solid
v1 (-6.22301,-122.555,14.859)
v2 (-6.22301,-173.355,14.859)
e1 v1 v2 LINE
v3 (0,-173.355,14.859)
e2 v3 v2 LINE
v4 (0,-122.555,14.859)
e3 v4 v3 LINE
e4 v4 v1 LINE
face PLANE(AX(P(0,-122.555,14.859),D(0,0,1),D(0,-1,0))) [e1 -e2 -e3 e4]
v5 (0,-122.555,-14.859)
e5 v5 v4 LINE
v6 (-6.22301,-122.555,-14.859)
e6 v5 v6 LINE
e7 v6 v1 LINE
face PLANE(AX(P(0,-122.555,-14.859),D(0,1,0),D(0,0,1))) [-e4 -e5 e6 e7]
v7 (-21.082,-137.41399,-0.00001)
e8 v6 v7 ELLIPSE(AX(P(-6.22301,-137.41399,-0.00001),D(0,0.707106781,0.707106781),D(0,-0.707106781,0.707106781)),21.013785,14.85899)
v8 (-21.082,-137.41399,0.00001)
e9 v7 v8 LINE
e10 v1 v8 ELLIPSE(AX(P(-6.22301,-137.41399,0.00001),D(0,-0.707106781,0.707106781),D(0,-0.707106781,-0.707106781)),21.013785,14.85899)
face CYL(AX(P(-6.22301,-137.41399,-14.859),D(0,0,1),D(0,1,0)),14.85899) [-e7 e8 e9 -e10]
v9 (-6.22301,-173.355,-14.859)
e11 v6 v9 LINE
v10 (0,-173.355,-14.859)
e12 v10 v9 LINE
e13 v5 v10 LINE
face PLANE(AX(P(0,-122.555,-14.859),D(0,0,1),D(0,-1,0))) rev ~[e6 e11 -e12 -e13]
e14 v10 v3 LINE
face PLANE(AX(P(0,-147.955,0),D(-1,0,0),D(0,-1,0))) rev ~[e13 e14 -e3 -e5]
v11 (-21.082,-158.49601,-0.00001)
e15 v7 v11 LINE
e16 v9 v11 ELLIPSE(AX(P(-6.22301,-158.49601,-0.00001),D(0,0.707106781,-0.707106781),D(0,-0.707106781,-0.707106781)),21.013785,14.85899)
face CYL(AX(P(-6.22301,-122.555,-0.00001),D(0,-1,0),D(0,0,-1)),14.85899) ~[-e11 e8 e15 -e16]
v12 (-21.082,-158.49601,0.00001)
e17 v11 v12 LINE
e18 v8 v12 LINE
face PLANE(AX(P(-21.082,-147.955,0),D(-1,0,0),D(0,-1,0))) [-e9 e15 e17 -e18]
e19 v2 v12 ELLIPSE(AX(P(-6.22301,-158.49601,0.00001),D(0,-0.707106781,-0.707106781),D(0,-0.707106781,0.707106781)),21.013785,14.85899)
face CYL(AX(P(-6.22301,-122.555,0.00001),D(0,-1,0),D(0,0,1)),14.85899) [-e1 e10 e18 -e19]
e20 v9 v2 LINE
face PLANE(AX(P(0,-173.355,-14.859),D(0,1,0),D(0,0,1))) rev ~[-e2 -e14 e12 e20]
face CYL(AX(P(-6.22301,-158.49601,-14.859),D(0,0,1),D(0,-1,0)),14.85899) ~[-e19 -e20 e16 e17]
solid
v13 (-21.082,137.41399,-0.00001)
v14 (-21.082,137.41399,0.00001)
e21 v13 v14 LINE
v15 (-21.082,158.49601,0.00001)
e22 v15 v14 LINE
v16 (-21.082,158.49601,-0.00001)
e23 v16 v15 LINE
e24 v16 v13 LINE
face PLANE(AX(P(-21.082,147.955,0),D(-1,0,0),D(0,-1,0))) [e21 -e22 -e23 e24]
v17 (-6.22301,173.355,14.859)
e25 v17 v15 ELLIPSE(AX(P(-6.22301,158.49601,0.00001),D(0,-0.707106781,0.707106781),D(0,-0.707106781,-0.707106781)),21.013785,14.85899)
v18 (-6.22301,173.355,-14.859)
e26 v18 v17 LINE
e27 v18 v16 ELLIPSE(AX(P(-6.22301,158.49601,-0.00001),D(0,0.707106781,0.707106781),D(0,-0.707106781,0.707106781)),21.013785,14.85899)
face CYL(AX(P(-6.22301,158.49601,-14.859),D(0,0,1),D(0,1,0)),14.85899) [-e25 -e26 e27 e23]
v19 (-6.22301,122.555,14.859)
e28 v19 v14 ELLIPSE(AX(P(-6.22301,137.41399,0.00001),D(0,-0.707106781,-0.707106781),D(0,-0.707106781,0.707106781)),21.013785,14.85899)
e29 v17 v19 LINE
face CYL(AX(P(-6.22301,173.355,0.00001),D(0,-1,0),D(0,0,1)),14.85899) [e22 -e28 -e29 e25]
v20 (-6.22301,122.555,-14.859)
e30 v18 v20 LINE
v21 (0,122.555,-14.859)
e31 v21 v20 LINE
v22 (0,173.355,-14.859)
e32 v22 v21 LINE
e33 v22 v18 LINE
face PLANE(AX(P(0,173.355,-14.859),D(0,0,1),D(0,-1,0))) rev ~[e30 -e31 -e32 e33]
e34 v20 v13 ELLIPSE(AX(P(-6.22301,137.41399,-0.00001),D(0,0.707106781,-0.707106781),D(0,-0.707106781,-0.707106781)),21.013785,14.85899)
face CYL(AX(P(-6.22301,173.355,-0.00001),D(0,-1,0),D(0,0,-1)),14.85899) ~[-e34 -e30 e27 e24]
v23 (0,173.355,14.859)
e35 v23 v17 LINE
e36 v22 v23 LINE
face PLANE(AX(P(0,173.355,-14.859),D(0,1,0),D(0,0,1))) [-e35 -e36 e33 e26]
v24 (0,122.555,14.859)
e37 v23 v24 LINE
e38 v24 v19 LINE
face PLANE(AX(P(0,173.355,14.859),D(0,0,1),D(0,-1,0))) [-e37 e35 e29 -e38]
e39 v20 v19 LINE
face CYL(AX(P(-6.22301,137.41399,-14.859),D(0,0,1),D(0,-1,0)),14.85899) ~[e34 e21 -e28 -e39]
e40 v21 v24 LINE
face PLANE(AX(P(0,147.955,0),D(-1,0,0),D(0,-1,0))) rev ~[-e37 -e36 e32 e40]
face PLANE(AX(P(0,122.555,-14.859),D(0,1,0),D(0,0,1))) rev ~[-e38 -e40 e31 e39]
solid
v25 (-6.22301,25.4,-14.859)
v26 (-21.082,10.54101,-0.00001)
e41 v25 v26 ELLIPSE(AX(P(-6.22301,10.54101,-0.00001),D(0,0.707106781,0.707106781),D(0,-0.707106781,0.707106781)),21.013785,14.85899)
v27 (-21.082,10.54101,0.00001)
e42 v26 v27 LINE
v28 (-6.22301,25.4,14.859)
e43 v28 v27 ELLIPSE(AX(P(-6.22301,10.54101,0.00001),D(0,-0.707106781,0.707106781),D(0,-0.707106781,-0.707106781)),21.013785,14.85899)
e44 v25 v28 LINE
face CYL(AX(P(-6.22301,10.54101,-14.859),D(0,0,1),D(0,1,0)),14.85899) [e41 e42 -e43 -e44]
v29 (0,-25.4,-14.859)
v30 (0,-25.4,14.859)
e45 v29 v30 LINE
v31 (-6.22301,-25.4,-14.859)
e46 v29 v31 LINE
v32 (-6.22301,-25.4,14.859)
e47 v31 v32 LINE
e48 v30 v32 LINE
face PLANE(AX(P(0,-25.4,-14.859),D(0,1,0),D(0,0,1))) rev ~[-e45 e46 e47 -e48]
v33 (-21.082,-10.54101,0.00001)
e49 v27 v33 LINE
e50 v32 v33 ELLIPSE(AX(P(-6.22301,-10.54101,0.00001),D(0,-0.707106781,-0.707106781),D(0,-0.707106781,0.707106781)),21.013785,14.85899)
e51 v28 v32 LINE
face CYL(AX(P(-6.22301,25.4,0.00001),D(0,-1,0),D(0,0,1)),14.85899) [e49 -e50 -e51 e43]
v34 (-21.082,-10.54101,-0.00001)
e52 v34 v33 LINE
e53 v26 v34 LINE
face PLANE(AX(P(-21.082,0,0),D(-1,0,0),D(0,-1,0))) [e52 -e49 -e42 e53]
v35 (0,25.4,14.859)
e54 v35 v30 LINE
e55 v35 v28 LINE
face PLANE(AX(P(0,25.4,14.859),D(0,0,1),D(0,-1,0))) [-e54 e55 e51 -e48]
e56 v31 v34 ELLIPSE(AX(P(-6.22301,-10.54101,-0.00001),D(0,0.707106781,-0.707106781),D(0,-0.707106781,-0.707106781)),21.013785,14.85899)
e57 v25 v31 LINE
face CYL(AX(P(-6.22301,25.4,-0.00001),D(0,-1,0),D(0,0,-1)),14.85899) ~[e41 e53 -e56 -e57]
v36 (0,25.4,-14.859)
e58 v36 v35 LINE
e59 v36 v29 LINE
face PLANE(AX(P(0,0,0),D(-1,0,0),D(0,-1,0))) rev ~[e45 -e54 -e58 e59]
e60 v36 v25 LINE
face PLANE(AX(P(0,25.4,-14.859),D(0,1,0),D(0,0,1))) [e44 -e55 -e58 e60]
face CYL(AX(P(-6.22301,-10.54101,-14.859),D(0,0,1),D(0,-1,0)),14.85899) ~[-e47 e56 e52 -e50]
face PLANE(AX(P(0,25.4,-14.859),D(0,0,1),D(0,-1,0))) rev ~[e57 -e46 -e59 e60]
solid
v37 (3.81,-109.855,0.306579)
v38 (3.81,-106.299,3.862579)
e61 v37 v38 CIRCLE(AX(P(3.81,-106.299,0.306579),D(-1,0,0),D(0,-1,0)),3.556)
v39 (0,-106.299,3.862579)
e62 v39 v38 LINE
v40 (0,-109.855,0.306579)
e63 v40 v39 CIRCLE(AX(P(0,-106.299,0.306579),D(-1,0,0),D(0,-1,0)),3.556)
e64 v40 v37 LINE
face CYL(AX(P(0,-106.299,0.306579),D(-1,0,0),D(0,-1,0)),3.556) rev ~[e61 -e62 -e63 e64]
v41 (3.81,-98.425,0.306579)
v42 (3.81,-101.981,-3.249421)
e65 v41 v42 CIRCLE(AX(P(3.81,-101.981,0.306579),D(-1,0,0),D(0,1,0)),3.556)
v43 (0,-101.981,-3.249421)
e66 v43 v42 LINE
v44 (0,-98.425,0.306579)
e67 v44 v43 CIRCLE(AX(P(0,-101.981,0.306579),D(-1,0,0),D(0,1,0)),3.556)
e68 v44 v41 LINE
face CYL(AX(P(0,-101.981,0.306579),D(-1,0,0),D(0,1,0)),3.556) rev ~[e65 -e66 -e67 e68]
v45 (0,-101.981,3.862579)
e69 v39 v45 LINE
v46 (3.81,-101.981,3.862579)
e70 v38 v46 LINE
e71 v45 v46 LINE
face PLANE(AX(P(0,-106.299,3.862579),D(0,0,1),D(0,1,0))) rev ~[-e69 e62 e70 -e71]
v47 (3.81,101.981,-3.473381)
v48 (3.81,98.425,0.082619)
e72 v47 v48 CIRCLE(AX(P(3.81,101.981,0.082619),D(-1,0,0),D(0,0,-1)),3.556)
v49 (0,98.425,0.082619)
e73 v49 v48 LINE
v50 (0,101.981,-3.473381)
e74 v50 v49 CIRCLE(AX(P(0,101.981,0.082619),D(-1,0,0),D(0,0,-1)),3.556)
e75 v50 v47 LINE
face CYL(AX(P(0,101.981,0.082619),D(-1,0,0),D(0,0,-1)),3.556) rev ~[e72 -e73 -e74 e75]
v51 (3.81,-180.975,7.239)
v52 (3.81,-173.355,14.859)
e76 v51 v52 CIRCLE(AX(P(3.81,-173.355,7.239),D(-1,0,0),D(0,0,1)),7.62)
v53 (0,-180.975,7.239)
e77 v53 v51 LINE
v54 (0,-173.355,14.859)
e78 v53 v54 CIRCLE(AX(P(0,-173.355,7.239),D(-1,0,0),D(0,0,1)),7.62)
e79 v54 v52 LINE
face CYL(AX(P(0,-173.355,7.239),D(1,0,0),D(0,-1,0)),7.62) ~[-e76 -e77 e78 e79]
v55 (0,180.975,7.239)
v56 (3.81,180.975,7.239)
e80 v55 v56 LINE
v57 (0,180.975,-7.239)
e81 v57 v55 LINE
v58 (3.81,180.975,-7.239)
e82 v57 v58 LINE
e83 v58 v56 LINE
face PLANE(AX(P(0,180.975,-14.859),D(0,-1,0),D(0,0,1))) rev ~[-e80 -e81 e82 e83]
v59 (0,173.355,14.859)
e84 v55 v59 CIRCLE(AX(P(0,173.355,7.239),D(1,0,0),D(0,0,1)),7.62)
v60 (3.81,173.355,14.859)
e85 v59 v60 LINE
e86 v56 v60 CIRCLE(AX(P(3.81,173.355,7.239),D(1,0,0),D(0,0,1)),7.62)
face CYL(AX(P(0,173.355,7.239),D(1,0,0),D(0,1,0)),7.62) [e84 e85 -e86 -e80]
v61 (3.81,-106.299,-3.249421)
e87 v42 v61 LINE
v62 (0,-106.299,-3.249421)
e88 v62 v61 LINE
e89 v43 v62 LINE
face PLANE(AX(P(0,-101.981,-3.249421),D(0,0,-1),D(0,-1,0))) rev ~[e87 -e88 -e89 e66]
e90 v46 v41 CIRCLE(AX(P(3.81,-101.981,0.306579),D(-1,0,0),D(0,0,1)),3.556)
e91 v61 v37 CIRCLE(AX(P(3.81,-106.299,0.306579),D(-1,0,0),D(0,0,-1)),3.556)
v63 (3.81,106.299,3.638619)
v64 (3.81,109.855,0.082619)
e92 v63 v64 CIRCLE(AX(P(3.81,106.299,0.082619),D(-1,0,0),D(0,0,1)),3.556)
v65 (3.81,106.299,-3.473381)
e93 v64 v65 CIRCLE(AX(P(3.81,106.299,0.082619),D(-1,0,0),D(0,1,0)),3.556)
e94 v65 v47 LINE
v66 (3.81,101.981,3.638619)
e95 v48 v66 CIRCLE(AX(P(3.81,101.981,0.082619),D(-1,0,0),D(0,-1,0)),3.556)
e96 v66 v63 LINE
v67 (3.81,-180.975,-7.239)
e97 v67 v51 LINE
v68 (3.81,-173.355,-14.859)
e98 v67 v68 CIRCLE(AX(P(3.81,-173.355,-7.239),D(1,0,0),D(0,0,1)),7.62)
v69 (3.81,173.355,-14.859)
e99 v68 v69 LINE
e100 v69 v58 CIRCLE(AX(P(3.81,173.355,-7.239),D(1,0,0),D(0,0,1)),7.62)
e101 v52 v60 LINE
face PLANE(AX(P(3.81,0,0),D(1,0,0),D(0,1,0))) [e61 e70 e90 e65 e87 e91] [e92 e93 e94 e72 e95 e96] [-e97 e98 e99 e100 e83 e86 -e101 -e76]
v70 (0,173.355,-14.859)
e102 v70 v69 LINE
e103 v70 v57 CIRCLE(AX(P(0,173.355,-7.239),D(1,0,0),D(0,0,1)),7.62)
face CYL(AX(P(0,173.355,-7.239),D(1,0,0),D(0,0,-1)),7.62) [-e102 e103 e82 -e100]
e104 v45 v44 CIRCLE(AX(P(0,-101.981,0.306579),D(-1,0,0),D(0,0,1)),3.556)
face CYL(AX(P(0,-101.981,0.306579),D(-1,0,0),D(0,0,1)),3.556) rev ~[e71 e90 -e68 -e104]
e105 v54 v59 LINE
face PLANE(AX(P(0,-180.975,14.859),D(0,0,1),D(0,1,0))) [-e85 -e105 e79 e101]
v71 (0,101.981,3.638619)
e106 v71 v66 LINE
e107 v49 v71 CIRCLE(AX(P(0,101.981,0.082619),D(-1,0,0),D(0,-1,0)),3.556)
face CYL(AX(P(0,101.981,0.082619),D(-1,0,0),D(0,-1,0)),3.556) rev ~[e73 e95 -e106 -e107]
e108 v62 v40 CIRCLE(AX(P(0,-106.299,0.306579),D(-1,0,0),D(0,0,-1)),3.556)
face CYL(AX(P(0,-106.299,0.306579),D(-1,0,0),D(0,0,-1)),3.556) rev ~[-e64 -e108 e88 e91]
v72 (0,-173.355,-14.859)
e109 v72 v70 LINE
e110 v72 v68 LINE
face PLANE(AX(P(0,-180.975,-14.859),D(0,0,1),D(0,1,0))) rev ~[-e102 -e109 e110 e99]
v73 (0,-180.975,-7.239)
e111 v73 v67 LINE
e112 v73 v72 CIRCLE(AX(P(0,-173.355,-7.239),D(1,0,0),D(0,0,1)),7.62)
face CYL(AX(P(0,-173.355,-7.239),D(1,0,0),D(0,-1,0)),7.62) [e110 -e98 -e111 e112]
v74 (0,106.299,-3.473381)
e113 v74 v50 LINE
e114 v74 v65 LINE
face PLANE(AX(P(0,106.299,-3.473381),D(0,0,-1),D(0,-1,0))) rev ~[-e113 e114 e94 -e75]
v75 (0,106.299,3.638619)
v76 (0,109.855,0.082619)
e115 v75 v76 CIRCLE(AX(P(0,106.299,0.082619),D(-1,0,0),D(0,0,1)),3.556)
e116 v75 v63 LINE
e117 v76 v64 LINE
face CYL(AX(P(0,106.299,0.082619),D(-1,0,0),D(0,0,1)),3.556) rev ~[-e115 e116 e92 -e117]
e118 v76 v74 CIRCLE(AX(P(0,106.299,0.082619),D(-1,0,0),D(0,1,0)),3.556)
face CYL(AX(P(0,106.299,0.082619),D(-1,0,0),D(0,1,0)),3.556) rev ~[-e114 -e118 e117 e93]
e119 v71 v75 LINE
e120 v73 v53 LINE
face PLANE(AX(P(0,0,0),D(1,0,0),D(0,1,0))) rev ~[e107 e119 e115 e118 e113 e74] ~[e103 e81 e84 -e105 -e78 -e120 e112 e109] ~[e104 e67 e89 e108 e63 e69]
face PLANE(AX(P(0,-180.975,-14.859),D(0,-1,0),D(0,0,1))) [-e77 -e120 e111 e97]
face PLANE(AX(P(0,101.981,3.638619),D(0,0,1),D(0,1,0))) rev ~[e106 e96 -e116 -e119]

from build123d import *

# Parameters (mm, degrees)
F0_W     = 361.95
F0_H     = 29.718
F1_DEPTH = 3.81
F2_R     = 7.62
F4_DEPTH = 3.81
F5_W     = 50.8
F5_H     = 29.718
F6_DEPTH = 21.082
F7_R     = 14.85899
F7_2_R   = 14.85899
F7_3_R   = 14.85899


# Not quite as in the source:
# - a fillet or chamfer is up to 0.001 mm smaller than in the source, because OpenCascade refuses the exact size


with BuildPart() as f1:
    # F0 (on Right) → F1 (new body)
    with BuildSketch(Plane.YZ):
        Rectangle(F0_W, F0_H)
    extrude(amount=F1_DEPTH)

    # F2
    f2_edges = [f1.edges().sort_by_distance(p)[0] for p in [
        (1.905, 180.975, 14.859),
        (1.905, 180.975, -14.859),
        (1.905, -180.975, 14.859),
        (1.905, -180.975, -14.859),
    ]]
    fillet(f2_edges, radius=F2_R)

    # F3 (on face) → F4 (cut, through all)
    with BuildSketch(Plane(origin=(0, 0, 0), x_dir=(0, -1, 0), z_dir=(-1, 0, 0))):
        with BuildLine():
            Line((-101.981, 3.6386192348), (-106.299, 3.6386192348))
            ThreePointArc((-106.299, 3.6386192348), (-108.8134717139, 2.5970909487), (-109.855, 0.0826192348))
            ThreePointArc((-109.855, 0.0826192348), (-108.8134717139, -2.4318524791), (-106.299, -3.4733807652))
            Line((-106.299, -3.4733807652), (-101.981, -3.4733807652))
            ThreePointArc((-101.981, -3.4733807652), (-99.4665282861, -2.4318524791), (-98.425, 0.0826192348))
            ThreePointArc((-98.425, 0.0826192348), (-99.4665282861, 2.5970909487), (-101.981, 3.6386192348))
        make_face()
        with BuildLine():
            Line((106.299, 3.8625788135), (101.981, 3.8625788135))
            ThreePointArc((101.981, 3.8625788135), (99.4665282861, 2.8210505274), (98.425, 0.3065788135))
            ThreePointArc((98.425, 0.3065788135), (99.4665282861, -2.2078929004), (101.981, -3.2494211865))
            Line((101.981, -3.2494211865), (106.299, -3.2494211865))
            ThreePointArc((106.299, -3.2494211865), (108.8134717139, -2.2078929004), (109.855, 0.3065788135))
            ThreePointArc((109.855, 0.3065788135), (108.8134717139, 2.8210505274), (106.299, 3.8625788135))
        make_face()
    extrude(amount=-F4_DEPTH, mode=Mode.SUBTRACT)


with BuildPart() as f6:
    # F5 (on face) → F6 (new body)
    with BuildSketch(Plane(origin=(0, 0, 0), x_dir=(0, -1, 0), z_dir=(-1, 0, 0))):
        with Locations((-147.955, 0)):
            Rectangle(F5_W, F5_H)
    extrude(amount=F6_DEPTH)

    # F7 (radius 14.859 in the source; OpenCascade refuses exactly that, so slightly less here)
    f7_edges = [f6.edges().sort_by_distance(p)[0] for p in [
        (-21.082, 147.955, 14.859),
        (-21.082, 173.355, 0),
        (-21.082, 147.955, -14.859),
        (-21.082, 122.555, 0),
    ]]
    fillet(f7_edges, radius=F7_R)


with BuildPart() as f6b:
    # F5 (on face) → F6, piece 2 (new body)
    with BuildSketch(Plane(origin=(0, 0, 0), x_dir=(0, -1, 0), z_dir=(-1, 0, 0))):
        Rectangle(F5_W, F5_H)
    extrude(amount=F6_DEPTH)

    # F7#2 (radius 14.859 in the source; OpenCascade refuses exactly that, so slightly less here)
    f7_2_edges = [f6b.edges().sort_by_distance(p)[0] for p in [
        (-21.082, 0, 14.859),
        (-21.082, 25.4, 0),
        (-21.082, 0, -14.859),
        (-21.082, -25.4, 0),
    ]]
    fillet(f7_2_edges, radius=F7_2_R)


with BuildPart() as f6c:
    # F5 (on face) → F6, piece 3 (new body)
    with BuildSketch(Plane(origin=(0, 0, 0), x_dir=(0, -1, 0), z_dir=(-1, 0, 0))):
        with Locations((147.955, 0)):
            Rectangle(F5_W, F5_H)
    extrude(amount=F6_DEPTH)

    # F7#3 (radius 14.859 in the source; OpenCascade refuses exactly that, so slightly less here)
    f7_3_edges = [f6c.edges().sort_by_distance(p)[0] for p in [
        (-21.082, -147.955, 14.859),
        (-21.082, -122.555, 0),
        (-21.082, -147.955, -14.859),
        (-21.082, -173.355, 0),
    ]]
    fillet(f7_3_edges, radius=F7_3_R)


solid = Compound([f1.part, f6.part, f6b.part, f6c.part])
